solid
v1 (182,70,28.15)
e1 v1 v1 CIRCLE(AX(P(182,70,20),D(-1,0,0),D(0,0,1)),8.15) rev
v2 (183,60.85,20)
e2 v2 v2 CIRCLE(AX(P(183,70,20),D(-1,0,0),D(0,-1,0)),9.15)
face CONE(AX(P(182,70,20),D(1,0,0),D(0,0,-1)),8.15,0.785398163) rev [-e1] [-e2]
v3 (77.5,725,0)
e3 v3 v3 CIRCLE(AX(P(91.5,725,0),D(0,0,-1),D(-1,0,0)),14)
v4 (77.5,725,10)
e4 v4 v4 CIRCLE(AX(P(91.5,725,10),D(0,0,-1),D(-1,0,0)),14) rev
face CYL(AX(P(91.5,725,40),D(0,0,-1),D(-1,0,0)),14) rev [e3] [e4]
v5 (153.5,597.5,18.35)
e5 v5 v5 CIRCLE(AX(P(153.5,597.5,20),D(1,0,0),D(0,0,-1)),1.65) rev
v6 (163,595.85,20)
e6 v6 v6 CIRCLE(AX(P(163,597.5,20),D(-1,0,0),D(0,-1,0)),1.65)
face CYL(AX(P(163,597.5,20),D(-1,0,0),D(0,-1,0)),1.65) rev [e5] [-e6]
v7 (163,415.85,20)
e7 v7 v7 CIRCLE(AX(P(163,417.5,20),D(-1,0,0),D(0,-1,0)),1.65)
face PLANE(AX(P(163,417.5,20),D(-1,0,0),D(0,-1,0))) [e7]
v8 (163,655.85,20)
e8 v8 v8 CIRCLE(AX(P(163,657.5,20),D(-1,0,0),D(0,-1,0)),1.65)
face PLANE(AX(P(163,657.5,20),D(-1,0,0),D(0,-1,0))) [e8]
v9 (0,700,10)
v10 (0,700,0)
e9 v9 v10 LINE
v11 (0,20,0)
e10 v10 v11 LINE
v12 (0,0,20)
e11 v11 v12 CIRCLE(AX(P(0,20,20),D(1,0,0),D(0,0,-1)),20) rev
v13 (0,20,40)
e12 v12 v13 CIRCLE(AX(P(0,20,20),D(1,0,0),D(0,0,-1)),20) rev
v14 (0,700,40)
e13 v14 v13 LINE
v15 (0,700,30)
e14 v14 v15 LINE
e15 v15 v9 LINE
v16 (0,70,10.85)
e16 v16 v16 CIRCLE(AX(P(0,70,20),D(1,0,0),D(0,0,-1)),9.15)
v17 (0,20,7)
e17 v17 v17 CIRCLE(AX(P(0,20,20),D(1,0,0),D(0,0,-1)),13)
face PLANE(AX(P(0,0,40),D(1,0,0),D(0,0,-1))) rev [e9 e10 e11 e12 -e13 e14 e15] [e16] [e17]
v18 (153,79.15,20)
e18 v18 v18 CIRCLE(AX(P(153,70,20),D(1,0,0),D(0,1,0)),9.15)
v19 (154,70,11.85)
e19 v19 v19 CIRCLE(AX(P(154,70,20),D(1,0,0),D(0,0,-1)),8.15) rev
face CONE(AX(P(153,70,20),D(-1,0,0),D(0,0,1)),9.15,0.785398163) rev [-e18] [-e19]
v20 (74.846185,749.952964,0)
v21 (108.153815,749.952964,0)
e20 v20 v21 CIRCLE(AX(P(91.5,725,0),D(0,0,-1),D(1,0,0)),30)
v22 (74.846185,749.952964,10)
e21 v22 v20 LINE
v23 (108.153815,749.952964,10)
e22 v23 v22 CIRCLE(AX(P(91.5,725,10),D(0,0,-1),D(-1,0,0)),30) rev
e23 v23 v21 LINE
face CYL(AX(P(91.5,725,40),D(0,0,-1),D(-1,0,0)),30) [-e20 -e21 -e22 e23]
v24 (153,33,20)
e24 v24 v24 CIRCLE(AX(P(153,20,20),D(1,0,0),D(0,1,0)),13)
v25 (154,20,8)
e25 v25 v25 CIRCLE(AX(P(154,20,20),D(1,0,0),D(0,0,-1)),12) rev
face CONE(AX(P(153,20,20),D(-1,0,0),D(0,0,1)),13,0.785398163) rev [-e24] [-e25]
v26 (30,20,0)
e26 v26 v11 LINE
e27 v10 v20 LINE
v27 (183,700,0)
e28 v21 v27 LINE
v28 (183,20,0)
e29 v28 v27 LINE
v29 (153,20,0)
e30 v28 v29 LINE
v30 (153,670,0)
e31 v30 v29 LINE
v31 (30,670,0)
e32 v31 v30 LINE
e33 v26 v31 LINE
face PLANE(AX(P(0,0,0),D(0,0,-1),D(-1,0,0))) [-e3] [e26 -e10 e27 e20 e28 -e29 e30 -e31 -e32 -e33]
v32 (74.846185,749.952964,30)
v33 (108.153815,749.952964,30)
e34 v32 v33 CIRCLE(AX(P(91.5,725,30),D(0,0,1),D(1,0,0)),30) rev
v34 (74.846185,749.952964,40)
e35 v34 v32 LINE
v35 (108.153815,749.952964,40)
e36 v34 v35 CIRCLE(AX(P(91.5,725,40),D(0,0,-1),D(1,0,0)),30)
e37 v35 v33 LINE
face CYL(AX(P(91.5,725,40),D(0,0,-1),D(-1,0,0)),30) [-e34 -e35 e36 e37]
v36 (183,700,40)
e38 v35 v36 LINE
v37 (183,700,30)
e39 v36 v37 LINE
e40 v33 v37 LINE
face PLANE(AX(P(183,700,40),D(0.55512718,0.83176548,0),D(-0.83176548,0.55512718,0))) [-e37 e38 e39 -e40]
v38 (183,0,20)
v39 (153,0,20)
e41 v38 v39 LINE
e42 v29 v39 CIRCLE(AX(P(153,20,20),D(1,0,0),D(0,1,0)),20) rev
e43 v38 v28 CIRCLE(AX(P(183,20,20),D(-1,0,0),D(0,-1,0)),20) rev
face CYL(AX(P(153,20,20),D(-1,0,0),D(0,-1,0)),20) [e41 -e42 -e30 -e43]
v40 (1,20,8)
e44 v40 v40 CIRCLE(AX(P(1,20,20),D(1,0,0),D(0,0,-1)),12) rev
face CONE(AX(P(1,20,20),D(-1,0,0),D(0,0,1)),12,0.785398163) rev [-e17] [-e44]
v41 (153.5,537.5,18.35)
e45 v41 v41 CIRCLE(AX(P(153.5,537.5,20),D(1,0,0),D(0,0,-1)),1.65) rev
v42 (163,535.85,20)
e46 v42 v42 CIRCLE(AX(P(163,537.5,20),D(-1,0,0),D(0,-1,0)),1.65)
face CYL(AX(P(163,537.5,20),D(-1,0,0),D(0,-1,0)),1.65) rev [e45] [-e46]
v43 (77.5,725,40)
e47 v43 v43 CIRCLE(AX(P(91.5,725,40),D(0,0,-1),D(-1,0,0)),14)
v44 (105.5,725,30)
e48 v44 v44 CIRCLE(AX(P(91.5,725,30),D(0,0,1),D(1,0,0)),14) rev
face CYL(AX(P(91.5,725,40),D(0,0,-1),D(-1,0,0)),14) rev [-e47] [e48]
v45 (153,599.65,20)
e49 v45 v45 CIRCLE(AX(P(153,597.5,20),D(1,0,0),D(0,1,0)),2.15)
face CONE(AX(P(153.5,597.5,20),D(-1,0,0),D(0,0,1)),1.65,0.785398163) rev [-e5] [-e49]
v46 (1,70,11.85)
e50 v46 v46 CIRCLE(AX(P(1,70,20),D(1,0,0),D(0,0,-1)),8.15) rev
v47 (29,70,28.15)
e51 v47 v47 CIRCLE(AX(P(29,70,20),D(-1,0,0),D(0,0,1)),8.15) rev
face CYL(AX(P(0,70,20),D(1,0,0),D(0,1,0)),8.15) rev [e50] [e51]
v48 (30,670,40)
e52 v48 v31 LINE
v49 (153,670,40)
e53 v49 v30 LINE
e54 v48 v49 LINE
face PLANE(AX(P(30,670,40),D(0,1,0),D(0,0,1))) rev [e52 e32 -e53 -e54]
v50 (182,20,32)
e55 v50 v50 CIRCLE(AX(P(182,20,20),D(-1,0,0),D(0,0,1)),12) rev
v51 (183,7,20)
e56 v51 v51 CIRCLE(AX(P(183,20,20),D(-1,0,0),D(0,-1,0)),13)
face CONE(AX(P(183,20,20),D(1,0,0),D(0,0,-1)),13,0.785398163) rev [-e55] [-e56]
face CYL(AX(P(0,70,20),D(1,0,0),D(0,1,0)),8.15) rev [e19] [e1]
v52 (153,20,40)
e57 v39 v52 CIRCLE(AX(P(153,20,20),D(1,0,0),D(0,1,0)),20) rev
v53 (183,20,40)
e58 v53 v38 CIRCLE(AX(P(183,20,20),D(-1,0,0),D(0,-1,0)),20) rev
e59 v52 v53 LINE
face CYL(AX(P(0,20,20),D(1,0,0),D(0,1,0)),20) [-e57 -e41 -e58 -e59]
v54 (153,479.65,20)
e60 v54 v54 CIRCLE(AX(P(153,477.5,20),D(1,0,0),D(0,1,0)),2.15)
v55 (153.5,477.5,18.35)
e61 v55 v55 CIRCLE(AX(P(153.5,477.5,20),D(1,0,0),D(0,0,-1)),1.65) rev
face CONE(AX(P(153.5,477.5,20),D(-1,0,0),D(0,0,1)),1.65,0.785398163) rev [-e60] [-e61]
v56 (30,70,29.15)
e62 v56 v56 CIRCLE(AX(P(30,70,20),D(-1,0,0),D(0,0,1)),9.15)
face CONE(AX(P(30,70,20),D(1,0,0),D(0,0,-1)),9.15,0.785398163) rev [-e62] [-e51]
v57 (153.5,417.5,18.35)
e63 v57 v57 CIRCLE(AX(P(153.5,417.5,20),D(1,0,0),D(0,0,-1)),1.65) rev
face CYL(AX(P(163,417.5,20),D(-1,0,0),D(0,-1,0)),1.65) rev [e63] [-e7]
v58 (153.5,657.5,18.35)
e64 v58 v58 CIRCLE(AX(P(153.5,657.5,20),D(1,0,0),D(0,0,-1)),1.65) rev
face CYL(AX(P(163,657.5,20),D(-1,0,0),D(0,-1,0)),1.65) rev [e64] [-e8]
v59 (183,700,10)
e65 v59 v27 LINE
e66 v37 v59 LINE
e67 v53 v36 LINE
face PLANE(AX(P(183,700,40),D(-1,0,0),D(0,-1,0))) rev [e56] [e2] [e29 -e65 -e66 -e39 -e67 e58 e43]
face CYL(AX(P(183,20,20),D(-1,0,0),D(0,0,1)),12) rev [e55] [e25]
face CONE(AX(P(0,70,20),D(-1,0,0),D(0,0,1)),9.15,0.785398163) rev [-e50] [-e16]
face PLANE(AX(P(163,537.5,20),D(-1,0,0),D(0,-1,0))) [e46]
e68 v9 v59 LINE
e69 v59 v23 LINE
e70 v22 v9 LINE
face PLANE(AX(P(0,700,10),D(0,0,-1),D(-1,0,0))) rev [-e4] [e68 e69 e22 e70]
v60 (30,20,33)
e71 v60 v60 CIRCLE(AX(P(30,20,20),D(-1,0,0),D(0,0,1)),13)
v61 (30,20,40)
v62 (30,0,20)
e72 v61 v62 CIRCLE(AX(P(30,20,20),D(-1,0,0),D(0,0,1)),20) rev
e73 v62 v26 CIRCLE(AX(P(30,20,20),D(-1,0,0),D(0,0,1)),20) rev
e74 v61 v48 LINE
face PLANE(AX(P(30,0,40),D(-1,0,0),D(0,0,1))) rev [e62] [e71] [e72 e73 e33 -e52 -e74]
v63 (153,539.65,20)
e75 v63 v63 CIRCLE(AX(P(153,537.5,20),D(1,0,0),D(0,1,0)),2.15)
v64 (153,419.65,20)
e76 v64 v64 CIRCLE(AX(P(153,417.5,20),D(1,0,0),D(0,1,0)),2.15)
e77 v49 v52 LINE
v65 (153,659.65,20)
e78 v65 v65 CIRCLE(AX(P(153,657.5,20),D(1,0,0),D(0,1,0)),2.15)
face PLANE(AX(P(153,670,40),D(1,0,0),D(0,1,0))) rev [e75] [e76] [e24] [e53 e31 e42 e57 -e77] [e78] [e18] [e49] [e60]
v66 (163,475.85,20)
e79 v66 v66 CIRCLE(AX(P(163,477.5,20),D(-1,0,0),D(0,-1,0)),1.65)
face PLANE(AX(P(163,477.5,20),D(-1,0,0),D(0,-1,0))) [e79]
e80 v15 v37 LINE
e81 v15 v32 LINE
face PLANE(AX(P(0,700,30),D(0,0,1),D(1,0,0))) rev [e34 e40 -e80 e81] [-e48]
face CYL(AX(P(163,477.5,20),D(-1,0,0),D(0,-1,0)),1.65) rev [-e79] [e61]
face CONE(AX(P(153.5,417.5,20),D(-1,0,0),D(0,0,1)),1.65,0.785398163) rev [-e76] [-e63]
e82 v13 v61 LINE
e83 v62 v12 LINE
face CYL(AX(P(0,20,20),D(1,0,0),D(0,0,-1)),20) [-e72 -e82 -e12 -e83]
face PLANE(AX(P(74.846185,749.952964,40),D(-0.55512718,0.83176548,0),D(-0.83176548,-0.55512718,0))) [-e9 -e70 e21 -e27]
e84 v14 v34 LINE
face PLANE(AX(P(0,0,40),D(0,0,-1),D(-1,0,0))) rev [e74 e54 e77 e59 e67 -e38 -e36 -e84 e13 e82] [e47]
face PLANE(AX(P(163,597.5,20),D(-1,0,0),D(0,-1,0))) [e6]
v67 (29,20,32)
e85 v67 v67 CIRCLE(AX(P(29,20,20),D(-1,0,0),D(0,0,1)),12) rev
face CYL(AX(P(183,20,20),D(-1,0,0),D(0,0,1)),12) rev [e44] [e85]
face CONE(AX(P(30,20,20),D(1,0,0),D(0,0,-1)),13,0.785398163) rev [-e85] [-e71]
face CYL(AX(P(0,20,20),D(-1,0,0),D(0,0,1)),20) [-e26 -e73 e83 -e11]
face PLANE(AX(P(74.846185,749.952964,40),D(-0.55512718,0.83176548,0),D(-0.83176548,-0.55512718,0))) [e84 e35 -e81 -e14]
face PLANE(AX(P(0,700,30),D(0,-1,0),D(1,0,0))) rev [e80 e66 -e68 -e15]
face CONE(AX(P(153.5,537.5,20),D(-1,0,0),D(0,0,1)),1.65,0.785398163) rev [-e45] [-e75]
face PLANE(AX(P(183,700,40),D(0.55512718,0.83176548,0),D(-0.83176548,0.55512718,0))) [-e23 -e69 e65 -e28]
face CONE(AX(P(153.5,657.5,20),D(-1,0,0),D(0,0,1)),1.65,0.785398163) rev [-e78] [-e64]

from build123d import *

# Parameters (mm, degrees)
DODANIE_WYCI_GNI_CIE1_DEPTH = 40
ZAOKR_GLENIE1_R             = 20
SZKIC2_R                    = 12
WYTNIJ_WYCI_GNI_CIE1_DEPTH  = 725.630250542
SZKIC3_R                    = 8.15
WYTNIJ_WYCI_GNI_CIE2_DEPTH  = 725.630250542
SZKIC5_R                    = 14
DODANIE_WYCI_GNI_CIE2_DEPTH = 40
SZKIC6_W                    = 20
SZKIC6_H                    = 55
WYTNIJ_WYCI_GNI_CIE4_DEPTH  = 778.890737829
SZKIC4_R                    = 1.65
WYTNIJ_WYCI_GNI_CIE5_DEPTH  = 10
SFAZOWANIE1_SIZE            = 0.5
SFAZOWANIE2_SIZE            = 1


with BuildPart() as part:
    # Szkic1 → Dodanie-wyciągnięcie1 (new body)
    with BuildSketch(Plane.XY):
        Polygon((0, 0), (30, 0), (30, 670), (153, 670), (153, 0), (183, 0), (183, 700), (110, 700), (30, 700), (0, 700), align=None)
    extrude(amount=DODANIE_WYCI_GNI_CIE1_DEPTH)

    # Zaokrąglenie1
    zaokr_glenie1_edges = [part.edges().sort_by_distance(p)[0] for p in [
        (168, 0, 0),
        (168, 0, 40),
        (15, 0, 0),
        (15, 0, 40),
    ]]
    fillet(zaokr_glenie1_edges, radius=ZAOKR_GLENIE1_R - 0.0001)  # a hair under: the kernel refuses the full size

    # Szkic2 → Wytnij-wyciągnięcie1 (cut, through all)
    with BuildSketch(Plane.ZY):
        with Locations((20, 20)):
            Circle(SZKIC2_R)
    extrude(amount=-WYTNIJ_WYCI_GNI_CIE1_DEPTH, mode=Mode.SUBTRACT)

    # Szkic3 → Wytnij-wyciągnięcie2 (cut, through all)
    with BuildSketch(Plane(origin=(183, 0, 0), x_dir=(0, 0, -1), z_dir=(1, 0, 0))):
        with Locations(Location((-20, 70, 0), (0, 0, 90))):
            Circle(SZKIC3_R)
    extrude(amount=-WYTNIJ_WYCI_GNI_CIE2_DEPTH, mode=Mode.SUBTRACT)

    # Szkic5 → Dodanie-wyciągnięcie2 (add)
    with BuildSketch(Plane(origin=(0, 0, 0), x_dir=(-1, 0, 0), z_dir=(0, 0, -1))):
        with BuildLine():
            Line((-183, 700), (0, 700))
            Line((0, 700), (-74.84618459, 749.952964399))
            ThreePointArc((-74.84618459, 749.952964399), (-91.5, 755), (-108.15381541, 749.952964399))
            Line((-108.15381541, 749.952964399), (-183, 700))
        make_face()
        with Locations((-91.5, 725)):
            Circle(SZKIC5_R, mode=Mode.SUBTRACT)
    extrude(amount=-DODANIE_WYCI_GNI_CIE2_DEPTH)

    # Szkic6 → Wytnij-wyciągnięcie4 (cut, through all)
    with BuildSketch(Plane(origin=(183, 0, 0), x_dir=(0, 0, -1), z_dir=(1, 0, 0))):
        with Locations((-20, 727.5)):
            Rectangle(SZKIC6_W, SZKIC6_H)
    extrude(amount=-WYTNIJ_WYCI_GNI_CIE4_DEPTH, mode=Mode.SUBTRACT)

    # Szkic4 → Wytnij-wyciągnięcie5 (cut)
    with BuildSketch(Plane.ZY.offset(-153)):
        with Locations(Location((20, 657.5, 0), (0, 0, 270))):
            Circle(SZKIC4_R)
        with Locations(Location((20, 597.5, 0), (0, 0, 270))):
            Circle(SZKIC4_R)
        with Locations(Location((20, 537.5, 0), (0, 0, 270))):
            Circle(SZKIC4_R)
        with Locations(Location((20, 477.5, 0), (0, 0, 270))):
            Circle(SZKIC4_R)
        with Locations(Location((20, 417.5, 0), (0, 0, 270))):
            Circle(SZKIC4_R)
    extrude(amount=-WYTNIJ_WYCI_GNI_CIE5_DEPTH, mode=Mode.SUBTRACT)

    # Sfazowanie1
    sfazowanie1_edges = [part.edges().sort_by_distance(p)[0] for p in [
        (153, 659.15, 20),
        (153, 599.15, 20),
        (153, 539.15, 20),
        (153, 479.15, 20),
        (153, 419.15, 20),
    ]]
    chamfer(sfazowanie1_edges, length=SFAZOWANIE1_SIZE)

    # Sfazowanie2
    sfazowanie2_edges = [part.edges().sort_by_distance(p)[0] for p in [
        (30, 20, 8),
        (183, 20, 8),
        (153, 20, 8),
        (0, 20, 8),
        (0, 61.85, 20),
        (30, 61.85, 20),
        (153, 61.85, 20),
        (183, 61.85, 20),
    ]]
    chamfer(sfazowanie2_edges, length=SFAZOWANIE2_SIZE)


solid = part.part
